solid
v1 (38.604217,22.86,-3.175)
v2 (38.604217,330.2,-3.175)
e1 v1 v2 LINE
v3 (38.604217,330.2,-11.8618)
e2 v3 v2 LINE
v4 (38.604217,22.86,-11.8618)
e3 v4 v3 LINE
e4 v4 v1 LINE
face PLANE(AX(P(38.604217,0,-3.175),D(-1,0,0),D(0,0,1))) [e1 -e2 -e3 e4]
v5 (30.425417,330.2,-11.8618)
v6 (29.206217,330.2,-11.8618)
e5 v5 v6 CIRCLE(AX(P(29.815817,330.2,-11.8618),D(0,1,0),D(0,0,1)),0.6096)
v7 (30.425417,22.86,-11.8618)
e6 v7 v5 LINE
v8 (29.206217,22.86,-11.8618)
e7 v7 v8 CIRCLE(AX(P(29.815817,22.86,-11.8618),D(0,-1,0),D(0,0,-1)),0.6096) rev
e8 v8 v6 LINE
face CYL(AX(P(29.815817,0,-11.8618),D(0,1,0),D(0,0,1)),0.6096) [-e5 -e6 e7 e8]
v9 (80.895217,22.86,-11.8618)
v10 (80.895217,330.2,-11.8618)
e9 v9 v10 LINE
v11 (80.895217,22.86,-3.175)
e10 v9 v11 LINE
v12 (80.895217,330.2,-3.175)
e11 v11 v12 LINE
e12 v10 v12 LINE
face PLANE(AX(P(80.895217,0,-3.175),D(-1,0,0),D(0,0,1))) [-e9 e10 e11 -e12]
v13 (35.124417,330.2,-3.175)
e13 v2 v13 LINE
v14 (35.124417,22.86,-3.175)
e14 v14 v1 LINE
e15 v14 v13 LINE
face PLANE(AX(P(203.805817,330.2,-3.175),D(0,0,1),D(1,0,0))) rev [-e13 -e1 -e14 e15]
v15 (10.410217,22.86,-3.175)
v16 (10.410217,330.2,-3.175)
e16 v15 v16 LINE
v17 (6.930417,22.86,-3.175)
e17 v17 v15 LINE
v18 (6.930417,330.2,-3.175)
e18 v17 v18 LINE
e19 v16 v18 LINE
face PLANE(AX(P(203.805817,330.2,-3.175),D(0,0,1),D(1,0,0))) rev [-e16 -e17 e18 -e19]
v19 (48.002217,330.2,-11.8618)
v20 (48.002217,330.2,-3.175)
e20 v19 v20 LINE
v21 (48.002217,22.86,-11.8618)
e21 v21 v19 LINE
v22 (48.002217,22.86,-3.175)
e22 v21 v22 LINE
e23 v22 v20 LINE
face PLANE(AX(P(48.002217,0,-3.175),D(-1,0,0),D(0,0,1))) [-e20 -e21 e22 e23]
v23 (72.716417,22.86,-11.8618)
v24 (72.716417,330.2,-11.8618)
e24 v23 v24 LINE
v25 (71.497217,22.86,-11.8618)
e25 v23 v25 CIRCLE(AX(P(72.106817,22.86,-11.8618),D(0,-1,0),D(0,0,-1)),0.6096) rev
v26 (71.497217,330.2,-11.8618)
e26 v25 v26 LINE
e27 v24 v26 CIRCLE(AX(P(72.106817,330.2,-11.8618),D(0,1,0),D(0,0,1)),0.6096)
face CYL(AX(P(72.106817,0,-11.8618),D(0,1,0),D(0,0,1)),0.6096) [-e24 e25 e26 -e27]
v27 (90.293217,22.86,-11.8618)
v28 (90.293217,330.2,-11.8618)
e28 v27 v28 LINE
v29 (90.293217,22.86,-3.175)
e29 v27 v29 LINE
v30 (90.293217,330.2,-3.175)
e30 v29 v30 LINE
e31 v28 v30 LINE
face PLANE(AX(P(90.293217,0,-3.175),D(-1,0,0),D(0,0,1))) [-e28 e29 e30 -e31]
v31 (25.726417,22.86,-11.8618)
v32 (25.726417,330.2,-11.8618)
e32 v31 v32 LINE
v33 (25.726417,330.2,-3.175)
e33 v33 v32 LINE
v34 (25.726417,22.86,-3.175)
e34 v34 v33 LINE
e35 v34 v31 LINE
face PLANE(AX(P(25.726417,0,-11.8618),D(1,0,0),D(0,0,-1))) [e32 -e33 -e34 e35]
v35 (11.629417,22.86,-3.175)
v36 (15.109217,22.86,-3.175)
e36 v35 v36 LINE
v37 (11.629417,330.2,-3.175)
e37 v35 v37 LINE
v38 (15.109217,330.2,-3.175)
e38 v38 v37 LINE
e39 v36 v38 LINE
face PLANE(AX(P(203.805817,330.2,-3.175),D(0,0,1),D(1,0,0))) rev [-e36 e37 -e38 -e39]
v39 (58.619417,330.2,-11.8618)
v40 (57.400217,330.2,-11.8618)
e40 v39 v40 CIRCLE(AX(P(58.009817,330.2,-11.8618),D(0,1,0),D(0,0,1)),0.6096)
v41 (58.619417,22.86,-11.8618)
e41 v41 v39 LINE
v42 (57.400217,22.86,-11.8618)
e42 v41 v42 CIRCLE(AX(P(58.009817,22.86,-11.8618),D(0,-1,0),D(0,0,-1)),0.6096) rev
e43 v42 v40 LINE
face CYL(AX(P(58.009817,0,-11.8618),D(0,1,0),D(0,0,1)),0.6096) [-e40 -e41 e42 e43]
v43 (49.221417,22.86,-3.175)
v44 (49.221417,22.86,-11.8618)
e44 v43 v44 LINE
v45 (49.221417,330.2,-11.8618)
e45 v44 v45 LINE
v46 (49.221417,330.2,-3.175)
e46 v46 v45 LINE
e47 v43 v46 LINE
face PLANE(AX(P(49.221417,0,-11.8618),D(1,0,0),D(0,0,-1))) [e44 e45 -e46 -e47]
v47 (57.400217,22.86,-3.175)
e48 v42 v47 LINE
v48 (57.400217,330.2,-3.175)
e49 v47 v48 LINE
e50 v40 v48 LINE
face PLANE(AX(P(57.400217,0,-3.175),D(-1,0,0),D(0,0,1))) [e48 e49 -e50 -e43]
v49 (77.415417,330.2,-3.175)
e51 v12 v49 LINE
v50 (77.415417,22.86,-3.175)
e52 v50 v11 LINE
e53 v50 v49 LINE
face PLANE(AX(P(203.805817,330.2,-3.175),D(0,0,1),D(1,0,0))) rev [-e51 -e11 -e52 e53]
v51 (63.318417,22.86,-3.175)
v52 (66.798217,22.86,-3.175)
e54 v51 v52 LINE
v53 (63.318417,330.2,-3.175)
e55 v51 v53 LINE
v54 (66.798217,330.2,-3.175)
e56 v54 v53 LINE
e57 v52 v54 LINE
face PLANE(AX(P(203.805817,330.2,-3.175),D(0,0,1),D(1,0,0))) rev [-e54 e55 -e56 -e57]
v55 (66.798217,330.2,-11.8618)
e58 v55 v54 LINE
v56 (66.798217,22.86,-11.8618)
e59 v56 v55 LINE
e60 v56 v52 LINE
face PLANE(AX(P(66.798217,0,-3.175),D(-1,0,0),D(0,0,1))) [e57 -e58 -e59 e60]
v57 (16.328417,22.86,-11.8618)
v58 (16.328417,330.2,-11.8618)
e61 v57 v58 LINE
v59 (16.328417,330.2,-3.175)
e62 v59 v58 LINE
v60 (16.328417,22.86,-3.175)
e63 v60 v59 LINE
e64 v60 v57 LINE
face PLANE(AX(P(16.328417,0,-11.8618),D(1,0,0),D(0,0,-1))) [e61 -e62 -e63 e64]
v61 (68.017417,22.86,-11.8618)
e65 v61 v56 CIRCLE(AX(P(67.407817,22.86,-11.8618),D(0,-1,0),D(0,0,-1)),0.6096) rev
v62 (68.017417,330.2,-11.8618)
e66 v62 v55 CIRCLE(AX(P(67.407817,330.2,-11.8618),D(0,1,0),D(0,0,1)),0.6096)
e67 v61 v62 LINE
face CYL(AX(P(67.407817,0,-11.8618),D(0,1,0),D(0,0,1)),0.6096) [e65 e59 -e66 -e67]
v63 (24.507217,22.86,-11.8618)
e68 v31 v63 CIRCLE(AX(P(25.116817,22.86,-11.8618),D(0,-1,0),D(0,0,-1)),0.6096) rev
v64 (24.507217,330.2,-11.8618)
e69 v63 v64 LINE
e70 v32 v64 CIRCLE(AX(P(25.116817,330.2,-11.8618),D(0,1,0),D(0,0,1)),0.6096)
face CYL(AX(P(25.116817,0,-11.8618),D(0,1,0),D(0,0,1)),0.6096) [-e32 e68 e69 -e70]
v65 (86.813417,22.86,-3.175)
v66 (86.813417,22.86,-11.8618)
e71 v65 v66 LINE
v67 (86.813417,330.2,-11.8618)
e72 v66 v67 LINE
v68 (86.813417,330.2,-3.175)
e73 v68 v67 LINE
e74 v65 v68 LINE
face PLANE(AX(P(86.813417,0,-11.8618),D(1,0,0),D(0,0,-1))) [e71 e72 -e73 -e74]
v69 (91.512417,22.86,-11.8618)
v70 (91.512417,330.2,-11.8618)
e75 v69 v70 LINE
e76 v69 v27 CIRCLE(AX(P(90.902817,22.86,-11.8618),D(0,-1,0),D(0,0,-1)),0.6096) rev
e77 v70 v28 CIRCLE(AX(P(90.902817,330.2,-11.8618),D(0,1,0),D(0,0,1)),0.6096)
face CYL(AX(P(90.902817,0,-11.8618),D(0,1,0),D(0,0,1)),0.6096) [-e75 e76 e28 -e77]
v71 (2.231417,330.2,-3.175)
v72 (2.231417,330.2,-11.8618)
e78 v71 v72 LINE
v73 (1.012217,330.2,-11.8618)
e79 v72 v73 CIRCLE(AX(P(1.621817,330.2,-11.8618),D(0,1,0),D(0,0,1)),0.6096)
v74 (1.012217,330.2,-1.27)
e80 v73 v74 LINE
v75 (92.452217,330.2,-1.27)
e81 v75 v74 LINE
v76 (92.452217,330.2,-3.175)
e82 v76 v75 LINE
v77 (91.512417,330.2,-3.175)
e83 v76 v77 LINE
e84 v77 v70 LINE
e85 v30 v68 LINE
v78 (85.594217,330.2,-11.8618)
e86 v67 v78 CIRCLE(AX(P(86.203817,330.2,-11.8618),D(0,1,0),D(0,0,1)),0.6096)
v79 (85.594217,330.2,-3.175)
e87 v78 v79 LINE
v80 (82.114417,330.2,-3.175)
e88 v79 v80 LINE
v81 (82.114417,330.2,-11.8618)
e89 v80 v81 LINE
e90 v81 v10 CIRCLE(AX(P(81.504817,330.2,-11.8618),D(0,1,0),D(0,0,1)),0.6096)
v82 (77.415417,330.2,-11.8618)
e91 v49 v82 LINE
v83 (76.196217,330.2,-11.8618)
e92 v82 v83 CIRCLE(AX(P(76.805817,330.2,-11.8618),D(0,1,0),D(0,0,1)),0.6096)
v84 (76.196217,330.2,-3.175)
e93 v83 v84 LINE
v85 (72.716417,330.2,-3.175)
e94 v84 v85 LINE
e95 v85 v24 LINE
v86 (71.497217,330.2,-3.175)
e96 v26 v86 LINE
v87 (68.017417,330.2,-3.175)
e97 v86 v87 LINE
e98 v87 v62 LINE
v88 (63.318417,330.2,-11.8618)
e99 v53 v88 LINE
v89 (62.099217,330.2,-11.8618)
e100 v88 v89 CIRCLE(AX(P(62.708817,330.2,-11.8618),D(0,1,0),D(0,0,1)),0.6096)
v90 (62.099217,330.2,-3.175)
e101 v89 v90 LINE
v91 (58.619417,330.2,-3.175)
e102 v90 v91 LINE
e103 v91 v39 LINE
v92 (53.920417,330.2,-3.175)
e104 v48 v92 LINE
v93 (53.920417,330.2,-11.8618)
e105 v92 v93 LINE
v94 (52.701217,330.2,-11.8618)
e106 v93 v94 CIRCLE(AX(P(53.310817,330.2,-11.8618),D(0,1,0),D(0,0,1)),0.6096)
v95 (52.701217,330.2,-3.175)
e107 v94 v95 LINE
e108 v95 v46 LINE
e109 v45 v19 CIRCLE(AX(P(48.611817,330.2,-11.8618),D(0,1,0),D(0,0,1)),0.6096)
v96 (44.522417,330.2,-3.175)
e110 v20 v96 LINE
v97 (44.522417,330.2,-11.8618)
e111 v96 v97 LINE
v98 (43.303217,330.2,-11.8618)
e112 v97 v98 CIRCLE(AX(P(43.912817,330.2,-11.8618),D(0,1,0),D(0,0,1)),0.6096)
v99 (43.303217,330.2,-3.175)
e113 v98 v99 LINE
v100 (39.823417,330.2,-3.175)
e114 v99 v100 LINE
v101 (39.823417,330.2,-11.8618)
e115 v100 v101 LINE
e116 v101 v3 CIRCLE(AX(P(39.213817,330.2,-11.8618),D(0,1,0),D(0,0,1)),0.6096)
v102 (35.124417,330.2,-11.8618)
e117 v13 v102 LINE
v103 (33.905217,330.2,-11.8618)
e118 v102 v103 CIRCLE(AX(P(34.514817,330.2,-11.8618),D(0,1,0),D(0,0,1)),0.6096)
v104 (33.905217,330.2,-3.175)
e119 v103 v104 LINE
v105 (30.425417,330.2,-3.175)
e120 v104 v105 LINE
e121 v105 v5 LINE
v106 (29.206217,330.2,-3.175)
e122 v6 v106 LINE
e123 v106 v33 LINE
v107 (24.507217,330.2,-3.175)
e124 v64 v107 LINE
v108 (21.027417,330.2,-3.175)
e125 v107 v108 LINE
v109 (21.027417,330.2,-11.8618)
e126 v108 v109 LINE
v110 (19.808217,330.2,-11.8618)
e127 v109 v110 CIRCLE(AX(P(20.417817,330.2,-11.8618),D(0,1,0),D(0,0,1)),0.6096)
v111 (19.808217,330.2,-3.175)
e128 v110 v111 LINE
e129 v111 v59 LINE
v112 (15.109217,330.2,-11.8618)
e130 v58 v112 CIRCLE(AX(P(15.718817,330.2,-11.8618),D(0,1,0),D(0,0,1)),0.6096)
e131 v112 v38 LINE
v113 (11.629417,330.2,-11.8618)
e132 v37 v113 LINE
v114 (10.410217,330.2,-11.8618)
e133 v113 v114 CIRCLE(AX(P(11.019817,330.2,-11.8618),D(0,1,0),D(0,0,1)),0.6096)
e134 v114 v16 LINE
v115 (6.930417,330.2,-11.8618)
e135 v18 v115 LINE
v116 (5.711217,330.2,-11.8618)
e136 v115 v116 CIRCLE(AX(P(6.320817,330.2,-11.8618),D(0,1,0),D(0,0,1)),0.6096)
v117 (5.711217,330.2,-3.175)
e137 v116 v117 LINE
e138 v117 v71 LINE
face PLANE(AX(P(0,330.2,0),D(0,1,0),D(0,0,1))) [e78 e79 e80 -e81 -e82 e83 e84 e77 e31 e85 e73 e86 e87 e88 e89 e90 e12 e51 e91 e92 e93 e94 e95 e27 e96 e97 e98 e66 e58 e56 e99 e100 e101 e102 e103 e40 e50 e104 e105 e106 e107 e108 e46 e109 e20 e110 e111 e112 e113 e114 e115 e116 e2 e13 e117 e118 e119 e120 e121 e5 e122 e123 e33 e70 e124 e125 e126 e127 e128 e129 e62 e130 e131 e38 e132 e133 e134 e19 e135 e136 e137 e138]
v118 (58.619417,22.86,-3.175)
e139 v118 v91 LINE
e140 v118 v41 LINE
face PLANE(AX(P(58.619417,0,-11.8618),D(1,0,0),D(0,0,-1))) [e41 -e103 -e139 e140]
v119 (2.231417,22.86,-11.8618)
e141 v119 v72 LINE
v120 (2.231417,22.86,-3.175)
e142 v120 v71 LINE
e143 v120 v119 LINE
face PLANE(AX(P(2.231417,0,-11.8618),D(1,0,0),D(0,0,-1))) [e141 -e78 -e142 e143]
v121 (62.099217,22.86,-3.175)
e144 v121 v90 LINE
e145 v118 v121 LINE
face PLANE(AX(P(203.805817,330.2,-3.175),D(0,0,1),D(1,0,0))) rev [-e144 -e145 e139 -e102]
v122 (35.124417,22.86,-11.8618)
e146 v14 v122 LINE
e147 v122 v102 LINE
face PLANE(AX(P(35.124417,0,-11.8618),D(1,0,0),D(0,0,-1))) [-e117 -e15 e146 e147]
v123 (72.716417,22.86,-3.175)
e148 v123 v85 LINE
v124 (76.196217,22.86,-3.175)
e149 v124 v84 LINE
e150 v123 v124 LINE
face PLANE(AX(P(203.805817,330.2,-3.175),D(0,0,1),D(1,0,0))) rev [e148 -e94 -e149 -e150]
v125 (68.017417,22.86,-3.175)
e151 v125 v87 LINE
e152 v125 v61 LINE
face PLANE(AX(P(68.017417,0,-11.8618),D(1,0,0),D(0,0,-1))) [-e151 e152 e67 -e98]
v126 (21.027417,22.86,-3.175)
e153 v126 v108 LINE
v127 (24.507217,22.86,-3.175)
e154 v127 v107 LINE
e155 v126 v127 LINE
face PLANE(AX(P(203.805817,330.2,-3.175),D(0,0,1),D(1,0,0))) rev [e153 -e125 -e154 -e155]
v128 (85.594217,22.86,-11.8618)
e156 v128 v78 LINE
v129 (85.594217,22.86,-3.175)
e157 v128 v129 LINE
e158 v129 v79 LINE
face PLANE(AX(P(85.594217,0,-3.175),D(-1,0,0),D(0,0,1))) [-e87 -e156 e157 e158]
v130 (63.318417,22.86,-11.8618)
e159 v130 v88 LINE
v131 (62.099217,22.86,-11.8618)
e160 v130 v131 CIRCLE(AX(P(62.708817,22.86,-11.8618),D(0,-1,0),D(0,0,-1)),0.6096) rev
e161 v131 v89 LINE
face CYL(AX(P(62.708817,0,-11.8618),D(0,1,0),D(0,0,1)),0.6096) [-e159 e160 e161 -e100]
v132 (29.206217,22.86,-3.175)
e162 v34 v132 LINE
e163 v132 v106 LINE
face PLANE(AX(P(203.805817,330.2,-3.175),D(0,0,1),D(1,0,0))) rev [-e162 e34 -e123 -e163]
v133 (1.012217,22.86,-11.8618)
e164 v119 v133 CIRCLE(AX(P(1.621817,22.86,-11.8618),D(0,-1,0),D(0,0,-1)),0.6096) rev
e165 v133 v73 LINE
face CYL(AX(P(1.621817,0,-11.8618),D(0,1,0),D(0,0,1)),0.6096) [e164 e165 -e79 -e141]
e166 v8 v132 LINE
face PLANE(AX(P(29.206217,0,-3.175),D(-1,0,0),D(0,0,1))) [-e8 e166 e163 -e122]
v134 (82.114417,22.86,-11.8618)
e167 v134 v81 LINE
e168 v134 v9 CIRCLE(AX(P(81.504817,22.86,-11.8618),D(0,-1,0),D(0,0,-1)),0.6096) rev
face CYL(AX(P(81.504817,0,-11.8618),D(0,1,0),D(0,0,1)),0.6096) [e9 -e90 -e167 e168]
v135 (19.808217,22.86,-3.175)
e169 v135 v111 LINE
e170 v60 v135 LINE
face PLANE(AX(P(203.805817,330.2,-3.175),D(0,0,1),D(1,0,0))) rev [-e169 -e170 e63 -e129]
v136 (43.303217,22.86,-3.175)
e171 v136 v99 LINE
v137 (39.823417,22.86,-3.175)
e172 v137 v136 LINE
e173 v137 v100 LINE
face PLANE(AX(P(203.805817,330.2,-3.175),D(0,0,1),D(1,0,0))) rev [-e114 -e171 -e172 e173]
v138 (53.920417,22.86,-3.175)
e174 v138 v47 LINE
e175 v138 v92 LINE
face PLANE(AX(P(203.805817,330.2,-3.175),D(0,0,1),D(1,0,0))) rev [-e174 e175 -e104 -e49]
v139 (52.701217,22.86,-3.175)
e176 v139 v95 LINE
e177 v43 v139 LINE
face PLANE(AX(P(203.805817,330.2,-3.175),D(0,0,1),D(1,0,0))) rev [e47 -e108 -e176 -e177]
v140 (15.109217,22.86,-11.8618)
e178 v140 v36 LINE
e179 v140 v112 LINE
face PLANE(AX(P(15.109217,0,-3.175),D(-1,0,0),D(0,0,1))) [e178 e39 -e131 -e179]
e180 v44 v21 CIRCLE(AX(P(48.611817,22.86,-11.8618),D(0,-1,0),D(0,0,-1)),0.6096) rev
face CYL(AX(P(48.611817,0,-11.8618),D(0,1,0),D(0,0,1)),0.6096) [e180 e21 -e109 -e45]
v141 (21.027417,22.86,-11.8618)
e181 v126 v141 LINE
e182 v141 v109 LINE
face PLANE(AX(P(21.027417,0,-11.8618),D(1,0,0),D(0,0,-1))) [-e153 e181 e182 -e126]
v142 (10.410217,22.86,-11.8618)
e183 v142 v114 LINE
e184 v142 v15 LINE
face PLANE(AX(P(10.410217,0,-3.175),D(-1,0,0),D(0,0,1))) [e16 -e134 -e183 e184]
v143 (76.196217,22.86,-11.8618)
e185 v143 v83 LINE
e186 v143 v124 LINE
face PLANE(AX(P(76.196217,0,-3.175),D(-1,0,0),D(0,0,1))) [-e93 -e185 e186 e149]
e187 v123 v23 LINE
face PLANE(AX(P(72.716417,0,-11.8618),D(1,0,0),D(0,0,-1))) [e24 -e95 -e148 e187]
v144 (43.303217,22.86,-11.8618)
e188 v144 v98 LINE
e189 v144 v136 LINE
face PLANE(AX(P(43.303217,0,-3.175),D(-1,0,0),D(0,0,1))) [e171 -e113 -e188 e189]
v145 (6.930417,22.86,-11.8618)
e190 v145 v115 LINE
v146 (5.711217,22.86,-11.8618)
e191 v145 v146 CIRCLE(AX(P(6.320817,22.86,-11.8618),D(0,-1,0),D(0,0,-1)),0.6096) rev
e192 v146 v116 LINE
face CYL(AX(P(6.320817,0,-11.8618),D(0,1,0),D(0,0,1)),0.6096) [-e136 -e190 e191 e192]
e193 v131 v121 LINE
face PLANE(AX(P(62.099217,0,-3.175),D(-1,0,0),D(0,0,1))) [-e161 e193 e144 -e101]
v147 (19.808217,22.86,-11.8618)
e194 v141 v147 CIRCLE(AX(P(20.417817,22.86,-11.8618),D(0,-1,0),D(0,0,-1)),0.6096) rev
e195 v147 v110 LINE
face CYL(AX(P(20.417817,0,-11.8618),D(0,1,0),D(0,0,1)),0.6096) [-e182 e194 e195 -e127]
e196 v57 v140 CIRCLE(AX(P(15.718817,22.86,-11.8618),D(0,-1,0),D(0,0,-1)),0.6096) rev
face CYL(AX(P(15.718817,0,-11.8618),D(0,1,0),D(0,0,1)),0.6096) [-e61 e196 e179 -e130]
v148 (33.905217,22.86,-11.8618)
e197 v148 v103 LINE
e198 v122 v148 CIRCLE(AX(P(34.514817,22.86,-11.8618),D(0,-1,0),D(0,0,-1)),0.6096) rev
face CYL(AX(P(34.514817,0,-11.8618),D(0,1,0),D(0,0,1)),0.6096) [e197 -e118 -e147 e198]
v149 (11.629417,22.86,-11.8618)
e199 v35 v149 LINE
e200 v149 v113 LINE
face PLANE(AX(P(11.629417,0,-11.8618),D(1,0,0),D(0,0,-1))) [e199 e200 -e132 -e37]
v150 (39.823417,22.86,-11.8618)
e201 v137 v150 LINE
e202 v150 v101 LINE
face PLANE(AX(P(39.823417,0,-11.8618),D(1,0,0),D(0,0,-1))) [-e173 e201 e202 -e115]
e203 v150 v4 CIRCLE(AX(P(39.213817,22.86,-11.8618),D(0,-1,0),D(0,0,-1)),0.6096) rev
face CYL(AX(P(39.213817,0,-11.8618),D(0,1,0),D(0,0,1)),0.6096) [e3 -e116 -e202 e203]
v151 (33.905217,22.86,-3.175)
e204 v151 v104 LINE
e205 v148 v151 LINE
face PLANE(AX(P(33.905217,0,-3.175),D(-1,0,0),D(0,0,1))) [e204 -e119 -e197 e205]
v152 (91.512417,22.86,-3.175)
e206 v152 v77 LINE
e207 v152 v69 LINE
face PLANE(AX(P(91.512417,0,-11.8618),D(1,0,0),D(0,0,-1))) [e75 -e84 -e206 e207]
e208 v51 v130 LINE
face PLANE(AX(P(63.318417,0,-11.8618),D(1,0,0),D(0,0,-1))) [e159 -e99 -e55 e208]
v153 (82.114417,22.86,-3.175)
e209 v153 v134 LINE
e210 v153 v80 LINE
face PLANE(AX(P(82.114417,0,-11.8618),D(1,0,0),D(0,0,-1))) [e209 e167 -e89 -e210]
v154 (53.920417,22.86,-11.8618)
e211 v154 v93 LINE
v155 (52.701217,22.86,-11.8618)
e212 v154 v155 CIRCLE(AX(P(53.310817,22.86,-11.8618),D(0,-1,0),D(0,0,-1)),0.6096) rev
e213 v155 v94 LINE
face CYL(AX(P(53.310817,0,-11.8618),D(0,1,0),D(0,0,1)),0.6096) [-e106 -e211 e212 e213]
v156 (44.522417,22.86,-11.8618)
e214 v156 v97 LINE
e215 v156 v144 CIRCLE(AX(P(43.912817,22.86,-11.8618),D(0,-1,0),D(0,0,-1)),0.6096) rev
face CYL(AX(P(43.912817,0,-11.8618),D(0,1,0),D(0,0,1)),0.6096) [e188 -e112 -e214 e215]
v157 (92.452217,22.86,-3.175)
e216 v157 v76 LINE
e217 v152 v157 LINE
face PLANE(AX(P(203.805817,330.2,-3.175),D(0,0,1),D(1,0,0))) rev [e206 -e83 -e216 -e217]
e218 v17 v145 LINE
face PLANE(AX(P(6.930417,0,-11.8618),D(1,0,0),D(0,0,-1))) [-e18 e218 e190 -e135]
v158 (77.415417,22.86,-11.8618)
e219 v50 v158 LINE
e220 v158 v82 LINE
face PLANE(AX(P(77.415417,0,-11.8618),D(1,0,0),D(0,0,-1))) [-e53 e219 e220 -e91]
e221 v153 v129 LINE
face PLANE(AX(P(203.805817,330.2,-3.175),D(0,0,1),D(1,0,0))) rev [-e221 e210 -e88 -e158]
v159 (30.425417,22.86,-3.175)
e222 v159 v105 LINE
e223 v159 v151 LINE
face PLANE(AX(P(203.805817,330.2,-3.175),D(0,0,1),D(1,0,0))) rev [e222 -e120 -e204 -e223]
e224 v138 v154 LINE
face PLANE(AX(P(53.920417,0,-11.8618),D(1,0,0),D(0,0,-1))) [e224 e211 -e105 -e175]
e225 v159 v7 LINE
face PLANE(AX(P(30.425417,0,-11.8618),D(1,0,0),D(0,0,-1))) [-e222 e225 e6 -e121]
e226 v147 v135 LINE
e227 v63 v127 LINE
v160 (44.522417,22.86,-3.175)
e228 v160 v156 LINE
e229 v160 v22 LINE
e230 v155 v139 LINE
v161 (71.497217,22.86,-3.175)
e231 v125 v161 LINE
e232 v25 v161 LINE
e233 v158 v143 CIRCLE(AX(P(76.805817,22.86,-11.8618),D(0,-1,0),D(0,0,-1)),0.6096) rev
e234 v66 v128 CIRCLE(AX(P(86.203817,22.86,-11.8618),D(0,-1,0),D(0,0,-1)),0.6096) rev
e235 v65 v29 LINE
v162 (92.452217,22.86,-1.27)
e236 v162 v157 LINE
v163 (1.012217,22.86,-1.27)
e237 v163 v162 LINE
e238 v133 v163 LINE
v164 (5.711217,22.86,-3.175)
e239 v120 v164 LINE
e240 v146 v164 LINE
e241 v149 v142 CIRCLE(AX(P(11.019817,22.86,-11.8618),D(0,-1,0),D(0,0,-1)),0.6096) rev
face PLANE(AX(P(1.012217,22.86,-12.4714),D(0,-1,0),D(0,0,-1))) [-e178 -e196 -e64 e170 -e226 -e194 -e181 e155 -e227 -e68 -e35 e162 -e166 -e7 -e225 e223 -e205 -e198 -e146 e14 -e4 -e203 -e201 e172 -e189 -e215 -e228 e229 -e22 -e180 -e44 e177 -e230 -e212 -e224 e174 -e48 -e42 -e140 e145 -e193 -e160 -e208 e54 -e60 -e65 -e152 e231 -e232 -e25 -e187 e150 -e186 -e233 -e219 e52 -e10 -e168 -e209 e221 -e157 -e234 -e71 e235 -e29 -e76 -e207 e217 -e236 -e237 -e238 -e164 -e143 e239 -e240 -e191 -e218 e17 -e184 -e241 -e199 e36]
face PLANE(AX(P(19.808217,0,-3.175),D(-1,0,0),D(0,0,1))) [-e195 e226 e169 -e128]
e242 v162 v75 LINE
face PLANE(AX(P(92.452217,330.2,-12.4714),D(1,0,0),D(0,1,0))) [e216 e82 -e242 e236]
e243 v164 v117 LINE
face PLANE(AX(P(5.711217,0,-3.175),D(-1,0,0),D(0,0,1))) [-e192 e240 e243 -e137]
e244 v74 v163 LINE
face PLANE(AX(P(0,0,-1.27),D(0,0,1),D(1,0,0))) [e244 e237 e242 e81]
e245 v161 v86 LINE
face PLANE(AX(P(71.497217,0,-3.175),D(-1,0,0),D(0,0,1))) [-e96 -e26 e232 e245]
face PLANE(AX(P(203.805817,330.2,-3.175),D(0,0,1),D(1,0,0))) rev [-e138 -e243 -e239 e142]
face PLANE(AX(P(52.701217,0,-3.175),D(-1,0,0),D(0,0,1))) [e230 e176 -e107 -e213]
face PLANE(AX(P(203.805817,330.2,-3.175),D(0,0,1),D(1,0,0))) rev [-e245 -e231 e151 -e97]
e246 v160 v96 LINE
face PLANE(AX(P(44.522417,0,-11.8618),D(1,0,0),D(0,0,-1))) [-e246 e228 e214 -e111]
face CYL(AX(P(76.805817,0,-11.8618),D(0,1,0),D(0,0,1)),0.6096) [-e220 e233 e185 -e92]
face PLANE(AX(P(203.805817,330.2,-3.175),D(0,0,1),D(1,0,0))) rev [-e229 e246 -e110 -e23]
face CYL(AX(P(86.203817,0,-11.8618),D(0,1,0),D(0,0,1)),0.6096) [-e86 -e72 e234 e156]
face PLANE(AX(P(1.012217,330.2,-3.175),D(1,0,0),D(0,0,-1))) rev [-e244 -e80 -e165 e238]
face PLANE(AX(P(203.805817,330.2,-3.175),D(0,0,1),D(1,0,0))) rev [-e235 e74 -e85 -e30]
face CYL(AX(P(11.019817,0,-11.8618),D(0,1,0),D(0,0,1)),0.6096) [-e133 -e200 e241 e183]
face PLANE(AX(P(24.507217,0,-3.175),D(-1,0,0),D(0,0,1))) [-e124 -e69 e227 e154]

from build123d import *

# Parameters (mm, degrees)
BOSS_EXTRUDE1_DEPTH   = 330.2
BOSS_EXTRUDE2_DEPTH   = 330.2
SKETCH_PATTERN1_DEPTH = 330.2
SKETCH5_W             = 0.4826
SKETCH5_H             = 3.175
BOSS_EXTRUDE3_DEPTH   = 254
SKETCH10_OUTSIDE_W    = 282.866
SKETCH10_OUTSIDE_H    = 409.79
SKETCH10_OUTSIDE_W_2  = 91.44
SKETCH10_OUTSIDE_H_2  = 330.2
CUT_EXTRUDE3_DEPTH    = 389.485949469
SKETCH11_OUTSIDE_W    = 162.01
SKETCH11_OUTSIDE_H    = 400.77
SKETCH11_OUTSIDE_W_2  = 91.44
SKETCH11_OUTSIDE_H_2  = 307.34
CUT_EXTRUDE4_DEPTH    = 344.125324268
SKETCH12_W            = 91.44
SKETCH12_H            = 307.34
CUT_EXTRUDE5_DEPTH    = 1.27


# Read off the part's stored shape, not the designer's step: Sketch-Pattern1
with BuildPart() as part:
    # Sketch1 → Boss-Extrude1 (new body)
    with BuildSketch(Plane(origin=(0, 0, 0), x_dir=(1, 0, 0), z_dir=(0, 1, 0))):
        Polygon((1.012216501, 3.175), (1.012216501, 0), (203.805816501, 0), (203.805816501, 3.175), (2.231416501, 3.175), align=None)
    extrude(amount=BOSS_EXTRUDE1_DEPTH)

    # Sketch3 → Boss-Extrude2 (add, through all)
    with BuildSketch(Plane(origin=(0, 330.2, 0), x_dir=(1, 0, 0), z_dir=(0, 1, 0))):
        with BuildLine():
            Line((1.012216501, 3.175), (1.012216501, 11.8618))
            ThreePointArc((1.012216501, 11.8618), (1.621816501, 12.4714), (2.231416501, 11.8618))
            Line((2.231416501, 11.8618), (2.231416501, 3.175))
            Line((2.231416501, 3.175), (1.012216501, 3.175))
        make_face()
    extrude(amount=-BOSS_EXTRUDE2_DEPTH)

    # Sketch-Pattern1 outline → Sketch-Pattern1 (add)
    with BuildSketch(Plane(origin=(0, 0, 0), x_dir=(1, 0, 0), z_dir=(0, 1, 0))):
        with BuildLine():
            Line((6.930416501, 3.175), (6.930416501, 11.8618))
            ThreePointArc((6.930416501, 11.8618), (6.320816501, 12.4714), (5.711216501, 11.8618))
            Line((5.711216501, 11.8618), (5.711216501, 3.175))
            Line((5.711216501, 3.175), (6.930416501, 3.175))
        make_face()
        with BuildLine():
            Line((203.069216501, 11.8618), (203.069216501, 3.175))
            Line((203.069216501, 3.175), (204.288416501, 3.175))
            Line((204.288416501, 3.175), (204.288416501, 11.8618))
            ThreePointArc((204.288416501, 11.8618), (203.678816501, 12.4714), (203.069216501, 11.8618))
        make_face()
        with BuildLine():
            Line((198.370216501, 11.8618), (198.370216501, 3.175))
            Line((198.370216501, 3.175), (199.589416501, 3.175))
            Line((199.589416501, 3.175), (199.589416501, 11.8618))
            ThreePointArc((199.589416501, 11.8618), (198.979816501, 12.4714), (198.370216501, 11.8618))
        make_face()
        with BuildLine():
            Line((193.671216501, 11.8618), (193.671216501, 3.175))
            Line((193.671216501, 3.175), (194.890416501, 3.175))
            Line((194.890416501, 3.175), (194.890416501, 11.8618))
            ThreePointArc((194.890416501, 11.8618), (194.280816501, 12.4714), (193.671216501, 11.8618))
        make_face()
        with BuildLine():
            Line((188.972216501, 11.8618), (188.972216501, 3.175))
            Line((188.972216501, 3.175), (190.191416501, 3.175))
            Line((190.191416501, 3.175), (190.191416501, 11.8618))
            ThreePointArc((190.191416501, 11.8618), (189.581816501, 12.4714), (188.972216501, 11.8618))
        make_face()
        with BuildLine():
            Line((184.273216501, 11.8618), (184.273216501, 3.175))
            Line((184.273216501, 3.175), (185.492416501, 3.175))
            Line((185.492416501, 3.175), (185.492416501, 11.8618))
            ThreePointArc((185.492416501, 11.8618), (184.882816501, 12.4714), (184.273216501, 11.8618))
        make_face()
        with BuildLine():
            Line((179.574216501, 11.8618), (179.574216501, 3.175))
            Line((179.574216501, 3.175), (180.793416501, 3.175))
            Line((180.793416501, 3.175), (180.793416501, 11.8618))
            ThreePointArc((180.793416501, 11.8618), (180.183816501, 12.4714), (179.574216501, 11.8618))
        make_face()
        with BuildLine():
            Line((174.875216501, 11.8618), (174.875216501, 3.175))
            Line((174.875216501, 3.175), (176.094416501, 3.175))
            Line((176.094416501, 3.175), (176.094416501, 11.8618))
            ThreePointArc((176.094416501, 11.8618), (175.484816501, 12.4714), (174.875216501, 11.8618))
        make_face()
        with BuildLine():
            Line((170.176216501, 11.8618), (170.176216501, 3.175))
            Line((170.176216501, 3.175), (171.395416501, 3.175))
            Line((171.395416501, 3.175), (171.395416501, 11.8618))
            ThreePointArc((171.395416501, 11.8618), (170.785816501, 12.4714), (170.176216501, 11.8618))
        make_face()
        with BuildLine():
            Line((165.477216501, 11.8618), (165.477216501, 3.175))
            Line((165.477216501, 3.175), (166.696416501, 3.175))
            Line((166.696416501, 3.175), (166.696416501, 11.8618))
            ThreePointArc((166.696416501, 11.8618), (166.086816501, 12.4714), (165.477216501, 11.8618))
        make_face()
        with BuildLine():
            Line((160.778216501, 11.8618), (160.778216501, 3.175))
            Line((160.778216501, 3.175), (161.997416501, 3.175))
            Line((161.997416501, 3.175), (161.997416501, 11.8618))
            ThreePointArc((161.997416501, 11.8618), (161.387816501, 12.4714), (160.778216501, 11.8618))
        make_face()
        with BuildLine():
            Line((156.079216501, 11.8618), (156.079216501, 3.175))
            Line((156.079216501, 3.175), (157.298416501, 3.175))
            Line((157.298416501, 3.175), (157.298416501, 11.8618))
            ThreePointArc((157.298416501, 11.8618), (156.688816501, 12.4714), (156.079216501, 11.8618))
        make_face()
        with BuildLine():
            Line((151.380216501, 11.8618), (151.380216501, 3.175))
            Line((151.380216501, 3.175), (152.599416501, 3.175))
            Line((152.599416501, 3.175), (152.599416501, 11.8618))
            ThreePointArc((152.599416501, 11.8618), (151.989816501, 12.4714), (151.380216501, 11.8618))
        make_face()
        with BuildLine():
            Line((146.681216501, 11.8618), (146.681216501, 3.175))
            Line((146.681216501, 3.175), (147.900416501, 3.175))
            Line((147.900416501, 3.175), (147.900416501, 11.8618))
            ThreePointArc((147.900416501, 11.8618), (147.290816501, 12.4714), (146.681216501, 11.8618))
        make_face()
        with BuildLine():
            Line((141.982216501, 11.8618), (141.982216501, 3.175))
            Line((141.982216501, 3.175), (143.201416501, 3.175))
            Line((143.201416501, 3.175), (143.201416501, 11.8618))
            ThreePointArc((143.201416501, 11.8618), (142.591816501, 12.4714), (141.982216501, 11.8618))
        make_face()
        with BuildLine():
            Line((137.283216501, 11.8618), (137.283216501, 3.175))
            Line((137.283216501, 3.175), (138.502416501, 3.175))
            Line((138.502416501, 3.175), (138.502416501, 11.8618))
            ThreePointArc((138.502416501, 11.8618), (137.892816501, 12.4714), (137.283216501, 11.8618))
        make_face()
        with BuildLine():
            Line((132.584216501, 11.8618), (132.584216501, 3.175))
            Line((132.584216501, 3.175), (133.803416501, 3.175))
            Line((133.803416501, 3.175), (133.803416501, 11.8618))
            ThreePointArc((133.803416501, 11.8618), (133.193816501, 12.4714), (132.584216501, 11.8618))
        make_face()
        with BuildLine():
            Line((127.885216501, 11.8618), (127.885216501, 3.175))
            Line((127.885216501, 3.175), (129.104416501, 3.175))
            Line((129.104416501, 3.175), (129.104416501, 11.8618))
            ThreePointArc((129.104416501, 11.8618), (128.494816501, 12.4714), (127.885216501, 11.8618))
        make_face()
        with BuildLine():
            Line((123.186216501, 11.8618), (123.186216501, 3.175))
            Line((123.186216501, 3.175), (124.405416501, 3.175))
            Line((124.405416501, 3.175), (124.405416501, 11.8618))
            ThreePointArc((124.405416501, 11.8618), (123.795816501, 12.4714), (123.186216501, 11.8618))
        make_face()
        with BuildLine():
            Line((118.487216501, 11.8618), (118.487216501, 3.175))
            Line((118.487216501, 3.175), (119.706416501, 3.175))
            Line((119.706416501, 3.175), (119.706416501, 11.8618))
            ThreePointArc((119.706416501, 11.8618), (119.096816501, 12.4714), (118.487216501, 11.8618))
        make_face()
        with BuildLine():
            Line((113.788216501, 11.8618), (113.788216501, 3.175))
            Line((113.788216501, 3.175), (115.007416501, 3.175))
            Line((115.007416501, 3.175), (115.007416501, 11.8618))
            ThreePointArc((115.007416501, 11.8618), (114.397816501, 12.4714), (113.788216501, 11.8618))
        make_face()
        with BuildLine():
            Line((109.089216501, 11.8618), (109.089216501, 3.175))
            Line((109.089216501, 3.175), (110.308416501, 3.175))
            Line((110.308416501, 3.175), (110.308416501, 11.8618))
            ThreePointArc((110.308416501, 11.8618), (109.698816501, 12.4714), (109.089216501, 11.8618))
        make_face()
        with BuildLine():
            Line((104.390216501, 11.8618), (104.390216501, 3.175))
            Line((104.390216501, 3.175), (105.609416501, 3.175))
            Line((105.609416501, 3.175), (105.609416501, 11.8618))
            ThreePointArc((105.609416501, 11.8618), (104.999816501, 12.4714), (104.390216501, 11.8618))
        make_face()
        with BuildLine():
            Line((99.691216501, 11.8618), (99.691216501, 3.175))
            Line((99.691216501, 3.175), (100.910416501, 3.175))
            Line((100.910416501, 3.175), (100.910416501, 11.8618))
            ThreePointArc((100.910416501, 11.8618), (100.300816501, 12.4714), (99.691216501, 11.8618))
        make_face()
        with BuildLine():
            Line((94.992216501, 11.8618), (94.992216501, 3.175))
            Line((94.992216501, 3.175), (96.211416501, 3.175))
            Line((96.211416501, 3.175), (96.211416501, 11.8618))
            ThreePointArc((96.211416501, 11.8618), (95.601816501, 12.4714), (94.992216501, 11.8618))
        make_face()
        with BuildLine():
            Line((90.293216501, 11.8618), (90.293216501, 3.175))
            Line((90.293216501, 3.175), (91.512416501, 3.175))
            Line((91.512416501, 3.175), (91.512416501, 11.8618))
            ThreePointArc((91.512416501, 11.8618), (90.902816501, 12.4714), (90.293216501, 11.8618))
        make_face()
        with BuildLine():
            Line((85.594216501, 11.8618), (85.594216501, 3.175))
            Line((85.594216501, 3.175), (86.813416501, 3.175))
            Line((86.813416501, 3.175), (86.813416501, 11.8618))
            ThreePointArc((86.813416501, 11.8618), (86.203816501, 12.4714), (85.594216501, 11.8618))
        make_face()
        with BuildLine():
            Line((80.895216501, 11.8618), (80.895216501, 3.175))
            Line((80.895216501, 3.175), (82.114416501, 3.175))
            Line((82.114416501, 3.175), (82.114416501, 11.8618))
            ThreePointArc((82.114416501, 11.8618), (81.504816501, 12.4714), (80.895216501, 11.8618))
        make_face()
        with BuildLine():
            Line((76.196216501, 11.8618), (76.196216501, 3.175))
            Line((76.196216501, 3.175), (77.415416501, 3.175))
            Line((77.415416501, 3.175), (77.415416501, 11.8618))
            ThreePointArc((77.415416501, 11.8618), (76.805816501, 12.4714), (76.196216501, 11.8618))
        make_face()
        with BuildLine():
            Line((71.497216501, 11.8618), (71.497216501, 3.175))
            Line((71.497216501, 3.175), (72.716416501, 3.175))
            Line((72.716416501, 3.175), (72.716416501, 11.8618))
            ThreePointArc((72.716416501, 11.8618), (72.106816501, 12.4714), (71.497216501, 11.8618))
        make_face()
        with BuildLine():
            Line((66.798216501, 11.8618), (66.798216501, 3.175))
            Line((66.798216501, 3.175), (68.017416501, 3.175))
            Line((68.017416501, 3.175), (68.017416501, 11.8618))
            ThreePointArc((68.017416501, 11.8618), (67.407816501, 12.4714), (66.798216501, 11.8618))
        make_face()
        with BuildLine():
            Line((62.099216501, 11.8618), (62.099216501, 3.175))
            Line((62.099216501, 3.175), (63.318416501, 3.175))
            Line((63.318416501, 3.175), (63.318416501, 11.8618))
            ThreePointArc((63.318416501, 11.8618), (62.708816501, 12.4714), (62.099216501, 11.8618))
        make_face()
        with BuildLine():
            Line((57.400216501, 11.8618), (57.400216501, 3.175))
            Line((57.400216501, 3.175), (58.619416501, 3.175))
            Line((58.619416501, 3.175), (58.619416501, 11.8618))
            ThreePointArc((58.619416501, 11.8618), (58.009816501, 12.4714), (57.400216501, 11.8618))
        make_face()
        with BuildLine():
            Line((52.701216501, 11.8618), (52.701216501, 3.175))
            Line((52.701216501, 3.175), (53.920416501, 3.175))
            Line((53.920416501, 3.175), (53.920416501, 11.8618))
            ThreePointArc((53.920416501, 11.8618), (53.310816501, 12.4714), (52.701216501, 11.8618))
        make_face()
        with BuildLine():
            Line((48.002216501, 11.8618), (48.002216501, 3.175))
            Line((48.002216501, 3.175), (49.221416501, 3.175))
            Line((49.221416501, 3.175), (49.221416501, 11.8618))
            ThreePointArc((49.221416501, 11.8618), (48.611816501, 12.4714), (48.002216501, 11.8618))
        make_face()
        with BuildLine():
            Line((43.303216501, 11.8618), (43.303216501, 3.175))
            Line((43.303216501, 3.175), (44.522416501, 3.175))
            Line((44.522416501, 3.175), (44.522416501, 11.8618))
            ThreePointArc((44.522416501, 11.8618), (43.912816501, 12.4714), (43.303216501, 11.8618))
        make_face()
        with BuildLine():
            Line((38.604216501, 11.8618), (38.604216501, 3.175))
            Line((38.604216501, 3.175), (39.823416501, 3.175))
            Line((39.823416501, 3.175), (39.823416501, 11.8618))
            ThreePointArc((39.823416501, 11.8618), (39.213816501, 12.4714), (38.604216501, 11.8618))
        make_face()
        with BuildLine():
            Line((33.905216501, 11.8618), (33.905216501, 3.175))
            Line((33.905216501, 3.175), (35.124416501, 3.175))
            Line((35.124416501, 3.175), (35.124416501, 11.8618))
            ThreePointArc((35.124416501, 11.8618), (34.514816501, 12.4714), (33.905216501, 11.8618))
        make_face()
        with BuildLine():
            Line((29.206216501, 11.8618), (29.206216501, 3.175))
            Line((29.206216501, 3.175), (30.425416501, 3.175))
            Line((30.425416501, 3.175), (30.425416501, 11.8618))
            ThreePointArc((30.425416501, 11.8618), (29.815816501, 12.4714), (29.206216501, 11.8618))
        make_face()
        with BuildLine():
            Line((24.507216501, 11.8618), (24.507216501, 3.175))
            Line((24.507216501, 3.175), (25.726416501, 3.175))
            Line((25.726416501, 3.175), (25.726416501, 11.8618))
            ThreePointArc((25.726416501, 11.8618), (25.116816501, 12.4714), (24.507216501, 11.8618))
        make_face()
        with BuildLine():
            Line((19.808216501, 11.8618), (19.808216501, 3.175))
            Line((19.808216501, 3.175), (21.027416501, 3.175))
            Line((21.027416501, 3.175), (21.027416501, 11.8618))
            ThreePointArc((21.027416501, 11.8618), (20.417816501, 12.4714), (19.808216501, 11.8618))
        make_face()
        with BuildLine():
            Line((15.109216501, 11.8618), (15.109216501, 3.175))
            Line((15.109216501, 3.175), (16.328416501, 3.175))
            Line((16.328416501, 3.175), (16.328416501, 11.8618))
            ThreePointArc((16.328416501, 11.8618), (15.718816501, 12.4714), (15.109216501, 11.8618))
        make_face()
        with BuildLine():
            Line((10.410216501, 11.8618), (10.410216501, 3.175))
            Line((10.410216501, 3.175), (11.629416501, 3.175))
            Line((11.629416501, 3.175), (11.629416501, 11.8618))
            ThreePointArc((11.629416501, 11.8618), (11.019816501, 12.4714), (10.410216501, 11.8618))
        make_face()
    extrude(amount=SKETCH_PATTERN1_DEPTH)

    # Sketch5 → Boss-Extrude3 (add)
    with BuildSketch(Plane(origin=(0, 330.2, 0), x_dir=(1, 0, 0), z_dir=(0, 1, 0))):
        with Locations((204.047116501, 1.5875)):
            Rectangle(SKETCH5_W, SKETCH5_H)
    extrude(amount=-BOSS_EXTRUDE3_DEPTH)

    # Sketch10 outside → Cut-Extrude3 (cut, through all)
    with BuildSketch(Plane.XY):
        with Locations((102.65, 165.1)):
            Rectangle(SKETCH10_OUTSIDE_W, SKETCH10_OUTSIDE_H)
        with Locations((46.732216501, 165.1)):
            Rectangle(SKETCH10_OUTSIDE_W_2, SKETCH10_OUTSIDE_H_2, mode=Mode.SUBTRACT)
    extrude(amount=-CUT_EXTRUDE3_DEPTH, mode=Mode.SUBTRACT)

    # Sketch11 outside → Cut-Extrude4 (cut, through all)
    with BuildSketch(Plane.XY):
        with Locations((46.732, 165.1)):
            Rectangle(SKETCH11_OUTSIDE_W, SKETCH11_OUTSIDE_H)
        with Locations((46.732216501, 176.53)):
            Rectangle(SKETCH11_OUTSIDE_W_2, SKETCH11_OUTSIDE_H_2, mode=Mode.SUBTRACT)
    extrude(amount=-CUT_EXTRUDE4_DEPTH, mode=Mode.SUBTRACT)

    # Sketch12 → Cut-Extrude5 (cut)
    with BuildSketch(Plane.XY):
        with Locations((46.732216501, 176.53)):
            Rectangle(SKETCH12_W, SKETCH12_H)
    extrude(amount=-CUT_EXTRUDE5_DEPTH, mode=Mode.SUBTRACT)


solid = part.part
